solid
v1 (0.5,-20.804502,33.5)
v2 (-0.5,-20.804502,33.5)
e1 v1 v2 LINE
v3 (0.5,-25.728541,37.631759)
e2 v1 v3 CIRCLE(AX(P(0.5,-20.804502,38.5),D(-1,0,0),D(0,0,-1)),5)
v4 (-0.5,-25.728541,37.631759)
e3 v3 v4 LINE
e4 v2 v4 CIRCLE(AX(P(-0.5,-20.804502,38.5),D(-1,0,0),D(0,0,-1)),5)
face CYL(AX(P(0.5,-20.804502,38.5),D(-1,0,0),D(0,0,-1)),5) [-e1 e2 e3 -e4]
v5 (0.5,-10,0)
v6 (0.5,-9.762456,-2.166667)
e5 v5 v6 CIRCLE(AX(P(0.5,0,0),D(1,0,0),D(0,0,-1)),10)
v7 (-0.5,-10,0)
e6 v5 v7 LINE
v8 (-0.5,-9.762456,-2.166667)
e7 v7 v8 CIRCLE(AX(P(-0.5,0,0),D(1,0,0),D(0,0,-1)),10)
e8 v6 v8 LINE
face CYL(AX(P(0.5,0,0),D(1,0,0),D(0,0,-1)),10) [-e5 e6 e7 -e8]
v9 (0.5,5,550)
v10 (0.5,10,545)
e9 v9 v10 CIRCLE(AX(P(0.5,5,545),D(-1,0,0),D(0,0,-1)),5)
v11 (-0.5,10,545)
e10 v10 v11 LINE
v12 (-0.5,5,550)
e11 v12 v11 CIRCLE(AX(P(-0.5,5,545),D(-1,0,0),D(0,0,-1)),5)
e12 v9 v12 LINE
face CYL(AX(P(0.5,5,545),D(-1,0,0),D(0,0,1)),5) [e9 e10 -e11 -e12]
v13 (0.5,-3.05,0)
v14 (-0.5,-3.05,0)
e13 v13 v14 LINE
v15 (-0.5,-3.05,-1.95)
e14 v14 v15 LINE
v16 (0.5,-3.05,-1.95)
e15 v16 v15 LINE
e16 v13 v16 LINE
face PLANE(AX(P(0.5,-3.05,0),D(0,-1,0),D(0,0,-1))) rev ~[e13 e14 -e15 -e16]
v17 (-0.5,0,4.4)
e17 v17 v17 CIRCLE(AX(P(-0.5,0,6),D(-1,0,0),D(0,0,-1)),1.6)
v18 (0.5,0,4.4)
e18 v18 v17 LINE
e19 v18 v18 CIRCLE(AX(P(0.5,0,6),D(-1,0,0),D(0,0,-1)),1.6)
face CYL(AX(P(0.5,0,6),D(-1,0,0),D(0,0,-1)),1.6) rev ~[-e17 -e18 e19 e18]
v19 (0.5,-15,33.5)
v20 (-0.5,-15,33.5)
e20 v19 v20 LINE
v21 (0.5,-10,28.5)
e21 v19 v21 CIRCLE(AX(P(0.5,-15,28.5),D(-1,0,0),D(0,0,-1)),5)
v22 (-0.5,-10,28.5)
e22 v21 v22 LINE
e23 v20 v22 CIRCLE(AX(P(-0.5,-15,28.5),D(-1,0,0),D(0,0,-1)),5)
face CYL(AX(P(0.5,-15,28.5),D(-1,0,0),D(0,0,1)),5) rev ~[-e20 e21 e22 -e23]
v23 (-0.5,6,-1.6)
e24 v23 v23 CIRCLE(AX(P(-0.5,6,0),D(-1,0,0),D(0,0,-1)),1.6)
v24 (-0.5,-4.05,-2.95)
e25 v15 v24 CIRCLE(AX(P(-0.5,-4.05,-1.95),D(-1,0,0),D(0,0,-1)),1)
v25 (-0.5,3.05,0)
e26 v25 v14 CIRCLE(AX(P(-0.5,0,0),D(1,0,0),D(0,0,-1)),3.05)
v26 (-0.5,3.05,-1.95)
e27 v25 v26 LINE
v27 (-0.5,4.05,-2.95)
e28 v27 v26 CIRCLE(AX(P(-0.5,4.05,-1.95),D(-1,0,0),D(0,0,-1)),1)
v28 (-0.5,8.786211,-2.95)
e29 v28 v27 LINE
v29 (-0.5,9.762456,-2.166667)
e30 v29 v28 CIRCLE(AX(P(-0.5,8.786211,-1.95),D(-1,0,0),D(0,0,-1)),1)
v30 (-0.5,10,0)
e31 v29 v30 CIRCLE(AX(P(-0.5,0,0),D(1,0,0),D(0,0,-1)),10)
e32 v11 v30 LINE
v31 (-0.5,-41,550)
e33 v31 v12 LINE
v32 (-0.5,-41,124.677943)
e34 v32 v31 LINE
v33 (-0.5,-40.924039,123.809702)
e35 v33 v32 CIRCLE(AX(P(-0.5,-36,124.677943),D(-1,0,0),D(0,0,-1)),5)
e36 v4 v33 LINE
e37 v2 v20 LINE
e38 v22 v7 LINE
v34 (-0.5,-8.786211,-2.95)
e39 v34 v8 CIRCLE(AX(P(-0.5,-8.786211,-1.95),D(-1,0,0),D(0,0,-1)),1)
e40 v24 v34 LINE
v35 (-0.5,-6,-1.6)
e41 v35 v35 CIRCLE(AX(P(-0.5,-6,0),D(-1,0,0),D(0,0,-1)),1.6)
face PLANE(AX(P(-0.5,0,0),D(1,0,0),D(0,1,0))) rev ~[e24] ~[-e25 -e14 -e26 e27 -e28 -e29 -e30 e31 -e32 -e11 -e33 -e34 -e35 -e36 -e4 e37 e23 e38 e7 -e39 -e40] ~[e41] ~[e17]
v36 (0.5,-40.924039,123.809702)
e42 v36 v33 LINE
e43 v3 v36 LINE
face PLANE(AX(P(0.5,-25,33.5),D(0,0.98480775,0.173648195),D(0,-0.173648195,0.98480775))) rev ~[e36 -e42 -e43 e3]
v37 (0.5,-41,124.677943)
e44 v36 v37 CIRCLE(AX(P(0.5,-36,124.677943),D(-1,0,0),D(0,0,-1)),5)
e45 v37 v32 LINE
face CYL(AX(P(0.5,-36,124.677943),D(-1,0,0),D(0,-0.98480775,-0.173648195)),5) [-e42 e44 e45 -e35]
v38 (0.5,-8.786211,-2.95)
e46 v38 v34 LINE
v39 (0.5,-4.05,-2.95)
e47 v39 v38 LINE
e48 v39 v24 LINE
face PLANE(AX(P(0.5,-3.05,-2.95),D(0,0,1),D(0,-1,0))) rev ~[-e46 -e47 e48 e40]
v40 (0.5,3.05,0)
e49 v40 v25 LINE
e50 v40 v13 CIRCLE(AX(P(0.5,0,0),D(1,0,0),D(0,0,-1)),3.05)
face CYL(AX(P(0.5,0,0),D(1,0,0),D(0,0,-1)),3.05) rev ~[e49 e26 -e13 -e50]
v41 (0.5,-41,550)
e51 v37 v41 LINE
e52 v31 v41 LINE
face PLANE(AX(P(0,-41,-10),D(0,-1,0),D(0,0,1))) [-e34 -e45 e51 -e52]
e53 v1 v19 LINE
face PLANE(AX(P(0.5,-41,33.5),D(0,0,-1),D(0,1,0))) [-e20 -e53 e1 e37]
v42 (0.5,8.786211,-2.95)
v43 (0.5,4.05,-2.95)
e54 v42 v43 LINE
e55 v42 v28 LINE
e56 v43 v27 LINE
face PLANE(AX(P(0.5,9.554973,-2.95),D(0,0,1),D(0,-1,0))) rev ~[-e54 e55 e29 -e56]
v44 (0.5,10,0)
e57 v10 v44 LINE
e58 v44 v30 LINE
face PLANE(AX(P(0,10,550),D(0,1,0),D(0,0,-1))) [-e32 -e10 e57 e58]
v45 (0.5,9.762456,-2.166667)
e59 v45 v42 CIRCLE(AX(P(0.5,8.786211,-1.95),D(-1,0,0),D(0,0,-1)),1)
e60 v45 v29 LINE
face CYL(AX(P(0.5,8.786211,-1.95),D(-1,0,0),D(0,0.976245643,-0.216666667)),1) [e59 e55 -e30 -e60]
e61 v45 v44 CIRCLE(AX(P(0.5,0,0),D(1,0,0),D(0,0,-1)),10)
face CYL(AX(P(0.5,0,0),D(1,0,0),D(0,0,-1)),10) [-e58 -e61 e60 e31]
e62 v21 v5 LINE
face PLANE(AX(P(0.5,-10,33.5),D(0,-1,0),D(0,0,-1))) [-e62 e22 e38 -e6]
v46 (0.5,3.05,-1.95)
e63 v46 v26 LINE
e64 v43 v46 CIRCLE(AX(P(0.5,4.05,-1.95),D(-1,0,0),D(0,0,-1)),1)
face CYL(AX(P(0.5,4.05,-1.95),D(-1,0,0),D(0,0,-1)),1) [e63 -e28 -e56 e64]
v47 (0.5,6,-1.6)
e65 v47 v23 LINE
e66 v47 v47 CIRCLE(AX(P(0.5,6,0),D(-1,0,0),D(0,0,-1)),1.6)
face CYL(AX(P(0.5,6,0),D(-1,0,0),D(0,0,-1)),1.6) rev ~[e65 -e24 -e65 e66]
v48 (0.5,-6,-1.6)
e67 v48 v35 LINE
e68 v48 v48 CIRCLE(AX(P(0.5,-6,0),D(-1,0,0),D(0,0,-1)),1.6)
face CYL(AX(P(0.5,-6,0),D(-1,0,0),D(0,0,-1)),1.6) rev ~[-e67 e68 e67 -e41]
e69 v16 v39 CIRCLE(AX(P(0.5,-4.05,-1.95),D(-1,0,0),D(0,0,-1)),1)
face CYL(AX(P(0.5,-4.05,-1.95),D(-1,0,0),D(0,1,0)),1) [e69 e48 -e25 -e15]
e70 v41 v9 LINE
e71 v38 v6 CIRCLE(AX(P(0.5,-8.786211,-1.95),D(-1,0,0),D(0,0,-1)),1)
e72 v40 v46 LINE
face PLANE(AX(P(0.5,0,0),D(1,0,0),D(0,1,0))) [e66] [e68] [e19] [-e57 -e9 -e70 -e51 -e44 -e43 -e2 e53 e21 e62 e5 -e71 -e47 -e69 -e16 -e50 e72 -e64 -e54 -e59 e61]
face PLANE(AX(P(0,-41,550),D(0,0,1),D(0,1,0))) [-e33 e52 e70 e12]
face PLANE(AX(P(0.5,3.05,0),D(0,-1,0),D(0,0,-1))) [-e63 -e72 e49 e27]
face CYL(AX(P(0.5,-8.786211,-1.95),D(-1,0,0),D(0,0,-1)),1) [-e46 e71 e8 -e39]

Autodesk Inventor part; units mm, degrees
ref_plane "YZ Plane" through (0, 0, 0) normal (1, 0, 0) x (0, 1, 0)
ref_plane "XZ Plane" through (0, 0, 0) normal (0, 1, 0) x (-1, 0, 0)
ref_plane "XY Plane" through (0, 0, 0) normal (0, 0, 1) x (1, 0, 0)
sketch "スケッチ1" plane through (0, 0, 0) normal (1, 0, 0) x (0, 1, 0)
  line L0 (-41, 550) -> (10, 550)
  line L1 (10, 550) -> (10, -10)
  line L2 (10, -10) -> (-41, -10)
  line L3 (-41, -10) -> (-41, 550)
  line L4 (-41, 550) -> (10, -10) construction
  line L5 (10, 550) -> (-41, -10) construction
  point P0 (0, 0)
  dimension "d0" = 51
  dimension "d1" = 560
  dimension "d42" = 10
  dimension "d43" = 10
extrude "プレート1" add sketch "スケッチ1" along normal mid plane 1
sketch "スケッチ3" plane through (0.5, 0, 0) normal (1, 0, 0) x (0, 0, -1)
  circle A0 centre (0, 0) radius 6
  line L0 (10, 10) -> (10, -41) projected
  line L1 (-550, 10) -> (10, 10) projected
  point P0 (0, 0)
  point P1 (0, 6)
  point P2 (-6, 0)
  point P3 (0, -6)
  point P4 (6, 0)
  dimension "d13" = 12
  dimension "d14" = 10
  dimension "d15" = 10
  dimension "d18" = 360
  dimension "d44" = 0
hole "穴2" at (0.5, 6, 0) at (0.5, 0, 6) at (0.5, -6, 0) at (0.5, 0, -6) direction (-1, 0, 0) diameter 3.2 end through all clearance for "Socket Head Cap Screw" size "M3" standard "Ansi Metric M Profile"
sketch "スケッチ4" plane through (0.5, 0, 0) normal (1, 0, 0) x (0, 0, -1)
  circle A0 centre (0, 0) radius 3.05
  point P0 (0, 0)
  dimension "d27" = 6.1
extrude "押し出し1" cut sketch "スケッチ4" against normal blind 10
sketch "スケッチ5" plane through (0.5, 0, 0) normal (1, 0, 0) x (0, 0, -1)
  line L0 (10, -41) -> (-33.5, -41)
  line L1 (-33.5, -41) -> (-33.5, -10)
  line L2 (-33.5, -10) -> (10, -10)
  line L3 (10, -10) -> (10, -41)
  line L4 (-550, 10) -> (-53.5, 10)
  line L5 (-53.5, 10) -> (-53.5, -12)
  line L6 (-53.5, -12) -> (-550, -12)
  line L7 (-550, -12) -> (-550, 10)
  line L8 (10, -41) -> (-550, -41) projected
  circle A0 centre (0, 0) radius 3.05 projected
  circle A1 centre (0, 0) radius 3.05 projected
  line L9 (0, 3.05) -> (10, 3.05)
  line L10 (0, -3.05) -> (10, -3.05)
  line L11 (10, 10) -> (10, -41) projected
  circle A2 centre (0, 0) radius 10
  circle A3 centre (0, 6) radius 1.6 projected
  circle A4 centre (0, -6) radius 1.6 projected
  line L12 (-550, 10) -> (10, 10) projected
  line L13 (2.95, 10) -> (2.95, -10)
  point P0 (0, 0)
  point P1 (2.95, -3.05)
  point P2 (2.95, 3.05)
  point P3 (2.95, 0.7746)
  point P4 (2.95, -0.7746)
  point P5 (9.5235, -3.05)
  point P6 (0, -10)
  point P7 (0, 10)
  point P8 (9.5235, 3.05)
  point P9 (10, 0)
  point P10 (2.95, -9.555)
  point P11 (2.95, 9.555)
  dimension "d35" = 29
  dimension "d36" = 20
  dimension "d40" = 33.5
  dimension "d41" = 10
  dimension "d45" = 2.95
extrude "押し出し2" cut sketch "スケッチ5" against normal blind 10 contours L0 L1 L2 L3 | L2 L13 A2 L10 L11 | L2 A2 L13 | L10 A2 L11 | L13 L10 A2 | L10 L13 A0 L9 A2 | A2 L9 L11 | L12 L13 A2 | L10 A0 L13 | L9 A2 L13 L12 L11 | L9 L13 A2 | L13 A0 L9 picked at (5.1412, -2.2915)
fillet "コーナーR4" radius 1 4 edges at (0, -3.05, -2.95) (0, 3.05, -2.95) (0, 9.555, -2.95) (0, -9.555, -2.95)
sketch "スケッチ6" plane through (0.5, 0, 0) normal (1, 0, 0) x (0, 0, -1)
  line L0 (-33.5, -41) -> (-550, -41) projected
  line L1 (-33.5, -41) -> (-33.5, -10) projected
  line L2 (-33.5, -25) -> (-124.2405, -41)
  point P0 (0, 0)
  point P1 (-545, -41)
  point P2 (-33.5, -15)
  dimension "d51" = 10
  dimension "d52" = 16
extrude "押し出し3" cut sketch "スケッチ6" against normal blind 10
fillet "コーナーR5" radius 5 2 edges at (0, -25, 33.5) (0, -41, 124.2405)
fillet "コーナーR6" radius 5 2 edges at (0, -10, 33.5) (0, 10, 550)
equation "\"d15\" = d14"
equation "\"d25\" = Thickness"
equation "\"d2\" = Thickness"
equation "\"d43\" = d42"
equation "\"BendRadius\" = Thickness"
equation "\"BendReliefWidth\" = Thickness"
equation "\"BendReliefDepth\" = 0.5 * Thickness"
equation "\"CornerReliefSize\" = 4 * Thickness"
equation "\"MinimumRemnant\" = 2 * Thickness"
equation "\"TransitionRadius\" = BendRadius"
equation "\"JacobiRadiusSize\" = BendRadius"
equation "\"GapSize\" = Thickness"
equation "\"Thickness\" = 1"
properties part number "s_carbon_plate5" material "CFRP"
